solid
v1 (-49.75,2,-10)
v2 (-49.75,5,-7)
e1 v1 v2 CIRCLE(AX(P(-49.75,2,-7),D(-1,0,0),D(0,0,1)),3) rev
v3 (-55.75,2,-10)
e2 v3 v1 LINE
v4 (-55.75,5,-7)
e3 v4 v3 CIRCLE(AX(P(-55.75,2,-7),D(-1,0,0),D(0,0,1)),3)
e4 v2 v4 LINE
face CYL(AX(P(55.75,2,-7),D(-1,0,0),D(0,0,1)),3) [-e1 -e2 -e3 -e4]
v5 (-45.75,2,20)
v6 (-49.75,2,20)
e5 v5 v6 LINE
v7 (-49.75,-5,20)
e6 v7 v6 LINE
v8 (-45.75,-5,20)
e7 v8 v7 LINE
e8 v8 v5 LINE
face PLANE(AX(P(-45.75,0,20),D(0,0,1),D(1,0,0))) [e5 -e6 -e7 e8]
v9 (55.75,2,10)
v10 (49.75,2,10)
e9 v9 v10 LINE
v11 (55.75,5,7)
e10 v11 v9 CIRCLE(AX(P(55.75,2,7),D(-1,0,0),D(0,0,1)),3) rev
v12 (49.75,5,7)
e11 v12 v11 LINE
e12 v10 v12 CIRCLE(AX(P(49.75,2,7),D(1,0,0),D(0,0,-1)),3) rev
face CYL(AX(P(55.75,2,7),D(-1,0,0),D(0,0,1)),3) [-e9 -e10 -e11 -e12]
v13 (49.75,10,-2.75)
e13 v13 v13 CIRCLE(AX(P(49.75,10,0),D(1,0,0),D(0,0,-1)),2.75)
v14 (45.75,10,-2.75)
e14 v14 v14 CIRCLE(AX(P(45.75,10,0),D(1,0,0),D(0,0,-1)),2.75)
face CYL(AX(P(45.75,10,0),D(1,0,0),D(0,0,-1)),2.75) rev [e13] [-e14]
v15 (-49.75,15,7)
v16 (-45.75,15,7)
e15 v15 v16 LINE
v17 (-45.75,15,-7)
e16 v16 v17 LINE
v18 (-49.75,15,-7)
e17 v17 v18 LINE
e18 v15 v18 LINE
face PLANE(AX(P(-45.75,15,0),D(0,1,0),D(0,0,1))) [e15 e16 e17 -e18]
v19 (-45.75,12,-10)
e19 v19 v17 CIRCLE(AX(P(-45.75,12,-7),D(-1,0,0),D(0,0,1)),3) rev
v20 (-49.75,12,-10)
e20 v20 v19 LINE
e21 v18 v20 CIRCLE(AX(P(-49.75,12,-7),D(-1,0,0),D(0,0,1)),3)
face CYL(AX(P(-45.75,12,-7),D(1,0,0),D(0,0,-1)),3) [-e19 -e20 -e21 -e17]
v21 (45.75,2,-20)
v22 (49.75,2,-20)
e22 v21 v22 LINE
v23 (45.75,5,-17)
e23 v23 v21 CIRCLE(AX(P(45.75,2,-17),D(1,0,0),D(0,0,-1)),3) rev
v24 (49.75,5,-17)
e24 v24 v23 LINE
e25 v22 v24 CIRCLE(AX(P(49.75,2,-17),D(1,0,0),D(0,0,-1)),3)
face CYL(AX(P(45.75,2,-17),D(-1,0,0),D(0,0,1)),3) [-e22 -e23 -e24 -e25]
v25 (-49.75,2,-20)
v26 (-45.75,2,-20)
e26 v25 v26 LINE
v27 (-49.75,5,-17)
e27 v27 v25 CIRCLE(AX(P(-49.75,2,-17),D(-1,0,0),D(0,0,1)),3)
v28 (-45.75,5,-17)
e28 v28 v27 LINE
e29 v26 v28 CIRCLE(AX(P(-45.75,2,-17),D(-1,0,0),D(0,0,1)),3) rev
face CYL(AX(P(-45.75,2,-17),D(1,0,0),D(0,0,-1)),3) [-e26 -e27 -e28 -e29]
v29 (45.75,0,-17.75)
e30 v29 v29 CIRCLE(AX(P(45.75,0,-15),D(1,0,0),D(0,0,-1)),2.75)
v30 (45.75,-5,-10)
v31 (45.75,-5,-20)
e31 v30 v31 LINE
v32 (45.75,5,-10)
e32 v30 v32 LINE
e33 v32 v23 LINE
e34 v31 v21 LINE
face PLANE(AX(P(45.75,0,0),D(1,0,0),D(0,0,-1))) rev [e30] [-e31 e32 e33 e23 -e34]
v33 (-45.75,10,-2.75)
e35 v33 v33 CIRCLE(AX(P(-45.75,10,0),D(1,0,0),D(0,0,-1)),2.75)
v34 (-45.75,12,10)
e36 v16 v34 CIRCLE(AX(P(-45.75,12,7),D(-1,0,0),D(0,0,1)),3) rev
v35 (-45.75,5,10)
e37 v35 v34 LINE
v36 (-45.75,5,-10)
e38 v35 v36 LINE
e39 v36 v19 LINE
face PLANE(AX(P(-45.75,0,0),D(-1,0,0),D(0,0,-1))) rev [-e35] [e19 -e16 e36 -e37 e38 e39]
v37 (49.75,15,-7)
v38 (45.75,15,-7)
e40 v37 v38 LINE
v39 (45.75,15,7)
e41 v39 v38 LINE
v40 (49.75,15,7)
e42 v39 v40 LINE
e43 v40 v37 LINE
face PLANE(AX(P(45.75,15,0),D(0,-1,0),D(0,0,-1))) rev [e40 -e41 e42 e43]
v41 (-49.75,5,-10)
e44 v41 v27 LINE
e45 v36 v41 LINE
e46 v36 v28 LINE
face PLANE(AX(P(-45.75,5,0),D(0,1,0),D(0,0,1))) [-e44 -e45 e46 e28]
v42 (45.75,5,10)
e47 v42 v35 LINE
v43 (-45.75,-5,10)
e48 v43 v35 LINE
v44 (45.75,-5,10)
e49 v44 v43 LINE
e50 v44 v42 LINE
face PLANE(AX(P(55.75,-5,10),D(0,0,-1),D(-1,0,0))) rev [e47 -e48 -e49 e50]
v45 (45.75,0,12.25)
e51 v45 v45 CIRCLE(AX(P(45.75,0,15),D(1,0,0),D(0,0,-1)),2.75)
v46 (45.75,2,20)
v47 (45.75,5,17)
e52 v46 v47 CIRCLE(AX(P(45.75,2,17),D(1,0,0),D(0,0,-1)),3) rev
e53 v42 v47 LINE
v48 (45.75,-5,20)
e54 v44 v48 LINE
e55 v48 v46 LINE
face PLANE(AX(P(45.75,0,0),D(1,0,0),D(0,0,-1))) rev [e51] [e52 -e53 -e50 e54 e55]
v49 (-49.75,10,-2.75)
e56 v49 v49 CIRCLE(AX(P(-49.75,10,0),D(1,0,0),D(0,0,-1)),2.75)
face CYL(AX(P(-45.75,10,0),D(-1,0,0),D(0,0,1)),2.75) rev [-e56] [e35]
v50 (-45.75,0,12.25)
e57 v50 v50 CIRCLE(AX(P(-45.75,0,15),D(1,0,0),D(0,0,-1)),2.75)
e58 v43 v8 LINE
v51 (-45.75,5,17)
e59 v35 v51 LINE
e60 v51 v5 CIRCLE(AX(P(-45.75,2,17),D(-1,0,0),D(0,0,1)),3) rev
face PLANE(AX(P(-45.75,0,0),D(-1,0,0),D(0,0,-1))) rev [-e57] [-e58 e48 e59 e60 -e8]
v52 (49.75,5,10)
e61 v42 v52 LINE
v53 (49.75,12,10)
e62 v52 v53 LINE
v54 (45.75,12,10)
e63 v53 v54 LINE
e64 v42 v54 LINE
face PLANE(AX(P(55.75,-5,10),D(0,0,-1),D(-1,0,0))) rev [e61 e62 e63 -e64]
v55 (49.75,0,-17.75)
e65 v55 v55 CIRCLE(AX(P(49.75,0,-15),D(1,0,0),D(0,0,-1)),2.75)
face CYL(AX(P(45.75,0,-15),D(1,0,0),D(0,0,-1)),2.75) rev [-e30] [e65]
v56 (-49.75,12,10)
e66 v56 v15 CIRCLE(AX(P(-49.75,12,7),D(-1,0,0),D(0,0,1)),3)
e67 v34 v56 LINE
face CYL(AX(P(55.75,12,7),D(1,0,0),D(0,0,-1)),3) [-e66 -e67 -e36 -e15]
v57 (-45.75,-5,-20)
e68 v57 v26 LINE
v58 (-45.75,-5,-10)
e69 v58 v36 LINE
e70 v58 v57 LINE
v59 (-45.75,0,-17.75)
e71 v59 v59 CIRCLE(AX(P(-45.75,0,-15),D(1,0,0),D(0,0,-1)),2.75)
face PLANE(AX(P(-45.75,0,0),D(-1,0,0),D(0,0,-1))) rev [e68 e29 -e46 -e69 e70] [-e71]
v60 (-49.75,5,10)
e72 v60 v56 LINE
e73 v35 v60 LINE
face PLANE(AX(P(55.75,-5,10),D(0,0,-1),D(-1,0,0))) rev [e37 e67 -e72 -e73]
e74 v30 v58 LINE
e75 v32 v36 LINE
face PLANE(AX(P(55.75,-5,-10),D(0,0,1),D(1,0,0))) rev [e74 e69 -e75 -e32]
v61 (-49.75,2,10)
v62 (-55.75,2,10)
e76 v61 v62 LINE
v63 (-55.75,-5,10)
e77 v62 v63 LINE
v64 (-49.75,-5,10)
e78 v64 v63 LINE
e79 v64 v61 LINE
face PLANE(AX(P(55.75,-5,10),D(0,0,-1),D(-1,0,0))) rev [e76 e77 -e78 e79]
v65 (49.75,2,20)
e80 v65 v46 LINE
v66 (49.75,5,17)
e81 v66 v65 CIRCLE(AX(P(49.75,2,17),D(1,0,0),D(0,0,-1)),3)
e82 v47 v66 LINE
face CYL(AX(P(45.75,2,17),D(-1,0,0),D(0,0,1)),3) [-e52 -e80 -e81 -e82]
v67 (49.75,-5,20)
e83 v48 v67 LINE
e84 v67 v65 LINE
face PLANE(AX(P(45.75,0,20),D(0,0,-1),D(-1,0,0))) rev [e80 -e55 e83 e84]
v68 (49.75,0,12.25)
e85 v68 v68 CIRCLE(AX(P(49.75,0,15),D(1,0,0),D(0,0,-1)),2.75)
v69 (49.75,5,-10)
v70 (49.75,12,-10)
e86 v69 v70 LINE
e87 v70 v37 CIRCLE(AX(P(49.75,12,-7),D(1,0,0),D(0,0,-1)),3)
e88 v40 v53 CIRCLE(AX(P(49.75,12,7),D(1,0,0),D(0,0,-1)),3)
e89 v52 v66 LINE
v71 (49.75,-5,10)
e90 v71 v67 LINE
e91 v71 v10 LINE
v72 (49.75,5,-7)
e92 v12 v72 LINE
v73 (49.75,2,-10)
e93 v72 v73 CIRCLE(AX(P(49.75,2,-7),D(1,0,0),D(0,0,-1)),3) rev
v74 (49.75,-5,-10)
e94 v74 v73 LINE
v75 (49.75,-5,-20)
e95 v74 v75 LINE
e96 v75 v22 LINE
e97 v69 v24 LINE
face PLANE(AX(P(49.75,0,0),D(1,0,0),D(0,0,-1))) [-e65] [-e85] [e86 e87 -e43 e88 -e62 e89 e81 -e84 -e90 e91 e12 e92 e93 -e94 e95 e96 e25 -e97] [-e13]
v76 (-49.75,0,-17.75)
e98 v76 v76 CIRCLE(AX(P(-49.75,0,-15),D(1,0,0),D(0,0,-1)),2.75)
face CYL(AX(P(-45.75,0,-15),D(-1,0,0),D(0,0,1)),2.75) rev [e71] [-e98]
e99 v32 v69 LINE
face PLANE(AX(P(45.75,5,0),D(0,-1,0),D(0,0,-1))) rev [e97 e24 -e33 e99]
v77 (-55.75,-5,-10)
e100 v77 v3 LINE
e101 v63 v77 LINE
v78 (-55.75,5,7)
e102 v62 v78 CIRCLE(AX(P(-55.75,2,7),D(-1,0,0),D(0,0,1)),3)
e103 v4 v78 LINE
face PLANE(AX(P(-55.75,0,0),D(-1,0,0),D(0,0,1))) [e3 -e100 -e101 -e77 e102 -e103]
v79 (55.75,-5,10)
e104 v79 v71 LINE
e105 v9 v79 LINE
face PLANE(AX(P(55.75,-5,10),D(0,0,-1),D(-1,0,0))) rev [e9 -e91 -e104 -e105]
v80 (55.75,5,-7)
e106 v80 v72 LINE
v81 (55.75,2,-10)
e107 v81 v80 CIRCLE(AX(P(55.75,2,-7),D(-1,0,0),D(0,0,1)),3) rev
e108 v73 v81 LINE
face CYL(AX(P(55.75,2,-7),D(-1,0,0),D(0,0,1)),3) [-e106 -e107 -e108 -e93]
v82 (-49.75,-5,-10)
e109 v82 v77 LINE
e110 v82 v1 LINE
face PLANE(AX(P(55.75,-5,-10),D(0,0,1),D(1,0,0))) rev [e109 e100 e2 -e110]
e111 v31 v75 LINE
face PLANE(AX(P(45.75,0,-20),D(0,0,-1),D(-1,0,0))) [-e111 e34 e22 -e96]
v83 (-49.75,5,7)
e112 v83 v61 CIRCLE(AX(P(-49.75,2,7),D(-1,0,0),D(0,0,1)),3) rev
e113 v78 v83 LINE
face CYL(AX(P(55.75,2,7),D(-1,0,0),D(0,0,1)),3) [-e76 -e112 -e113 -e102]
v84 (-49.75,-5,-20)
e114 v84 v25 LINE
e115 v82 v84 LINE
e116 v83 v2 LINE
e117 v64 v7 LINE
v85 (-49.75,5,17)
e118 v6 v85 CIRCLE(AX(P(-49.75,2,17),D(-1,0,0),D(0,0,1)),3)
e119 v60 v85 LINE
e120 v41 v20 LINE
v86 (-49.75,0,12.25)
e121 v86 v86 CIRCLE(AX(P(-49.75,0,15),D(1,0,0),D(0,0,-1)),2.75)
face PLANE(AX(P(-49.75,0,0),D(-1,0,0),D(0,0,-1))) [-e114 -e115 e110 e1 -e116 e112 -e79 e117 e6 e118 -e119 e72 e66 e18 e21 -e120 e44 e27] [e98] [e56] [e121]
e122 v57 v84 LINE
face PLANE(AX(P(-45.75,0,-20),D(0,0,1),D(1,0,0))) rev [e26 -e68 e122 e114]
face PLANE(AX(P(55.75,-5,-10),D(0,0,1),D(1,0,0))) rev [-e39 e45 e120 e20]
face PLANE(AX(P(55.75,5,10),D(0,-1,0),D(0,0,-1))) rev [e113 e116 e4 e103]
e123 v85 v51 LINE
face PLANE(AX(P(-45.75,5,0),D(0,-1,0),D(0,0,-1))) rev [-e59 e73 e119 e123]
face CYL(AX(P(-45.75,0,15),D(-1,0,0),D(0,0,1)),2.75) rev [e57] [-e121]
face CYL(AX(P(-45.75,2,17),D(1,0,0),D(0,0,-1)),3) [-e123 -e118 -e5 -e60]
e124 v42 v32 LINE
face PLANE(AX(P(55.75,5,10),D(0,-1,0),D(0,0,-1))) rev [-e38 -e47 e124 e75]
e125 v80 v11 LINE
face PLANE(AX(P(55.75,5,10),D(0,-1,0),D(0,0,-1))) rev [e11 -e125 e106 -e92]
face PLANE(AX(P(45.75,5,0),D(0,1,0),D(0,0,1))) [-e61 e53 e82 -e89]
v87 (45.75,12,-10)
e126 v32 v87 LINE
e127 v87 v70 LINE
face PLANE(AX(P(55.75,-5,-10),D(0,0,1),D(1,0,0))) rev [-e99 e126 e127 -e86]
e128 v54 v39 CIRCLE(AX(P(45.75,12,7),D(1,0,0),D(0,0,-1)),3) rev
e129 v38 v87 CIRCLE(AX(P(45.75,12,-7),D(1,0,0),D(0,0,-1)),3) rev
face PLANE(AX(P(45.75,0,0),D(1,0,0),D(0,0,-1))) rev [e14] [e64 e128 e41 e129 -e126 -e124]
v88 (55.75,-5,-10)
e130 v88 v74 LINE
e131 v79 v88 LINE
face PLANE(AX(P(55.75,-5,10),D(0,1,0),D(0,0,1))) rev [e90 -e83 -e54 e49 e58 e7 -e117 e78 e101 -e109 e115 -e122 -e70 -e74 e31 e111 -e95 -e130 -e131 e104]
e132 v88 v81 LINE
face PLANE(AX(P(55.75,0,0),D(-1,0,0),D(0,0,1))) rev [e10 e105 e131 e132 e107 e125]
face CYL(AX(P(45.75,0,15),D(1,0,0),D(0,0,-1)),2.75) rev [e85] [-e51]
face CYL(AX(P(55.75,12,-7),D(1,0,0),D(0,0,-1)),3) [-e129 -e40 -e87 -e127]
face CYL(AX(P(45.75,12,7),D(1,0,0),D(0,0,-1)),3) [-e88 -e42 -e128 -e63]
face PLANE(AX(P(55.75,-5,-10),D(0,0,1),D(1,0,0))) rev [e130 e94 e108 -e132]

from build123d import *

# Parameters (mm, degrees)
SKETCH_2_W             = 20
SKETCH_2_H             = 10
EXTRUDE_1_DEPTH        = 55.75
SKETCH_3_W             = 20
SKETCH_3_H             = 10
SKETCH_3_R             = 2.75
SKETCH_3_W_2           = 10
EXTRUDE_2_DEPTH        = 4
FILLET_1_R             = 3
FILLET_1_OF_MIRROR_1_R = 3
FILLET_2_R             = 3


with BuildPart() as part:
    # 草图2 → 凸台-拉伸1 (new, symmetric)
    with BuildSketch(Plane(origin=(0, 0, 0), x_dir=(0, 0, -1), z_dir=(1, 0, 0))):
        Rectangle(SKETCH_2_W, SKETCH_2_H)
    extrude(amount=EXTRUDE_1_DEPTH, both=True)

    # 草图3 → 凸台-拉伸2 (add)
    # profile 1 of 3: a face of its own
    with BuildSketch(Plane(origin=(49.75, 0, 0), x_dir=(0, 0, -1), z_dir=(1, 0, 0))):
        with Locations((0, 10)):
            Rectangle(SKETCH_3_W, SKETCH_3_H)
        with Locations((0, 10)):
            Circle(SKETCH_3_R, mode=Mode.SUBTRACT)
    # profile 2 of 3: a face of its own
    with BuildSketch(Plane(origin=(49.75, 0, 0), x_dir=(0, 0, -1), z_dir=(1, 0, 0))):
        with Locations((15, 0)):
            Rectangle(SKETCH_3_W_2, SKETCH_3_H)
        with Locations((15, 0)):
            Circle(SKETCH_3_R, mode=Mode.SUBTRACT)
    # profile 3 of 3: a face of its own
    with BuildSketch(Plane(origin=(49.75, 0, 0), x_dir=(0, 0, -1), z_dir=(1, 0, 0))):
        with Locations((-15, 0)):
            Rectangle(SKETCH_3_W_2, SKETCH_3_H)
        with Locations((-15, 0)):
            Circle(SKETCH_3_R, mode=Mode.SUBTRACT)
    extrude_2 = extrude(amount=-EXTRUDE_2_DEPTH)

    # 圆角1
    fillet_1_edges = [part.edges().sort_by_distance(p)[0] for p in [
        (47.75, 15, 10),
        (47.75, 15, -10),
        (47.75, 5, -20),
        (47.75, 5, 20),
    ]]
    fillet(fillet_1_edges, radius=FILLET_1_R)

    # 镜向1: 凸台-拉伸2 across plane
    add(extrude_2.mirror(Plane(origin=(0, 0, 0), x_dir=(0, 0, 1), z_dir=(1, 0, 0))))

    # 圆角1 of 镜向1
    fillet_1_of_mirror_1_edges = [part.edges().sort_by_distance(p)[0] for p in [
        (-47.75, 15, 10),
        (-47.75, 15, -10),
        (-47.75, 5, -20),
        (-47.75, 5, 20),
    ]]
    fillet(fillet_1_of_mirror_1_edges, radius=FILLET_1_OF_MIRROR_1_R)

    # 圆角2
    # the kernel refuses this fillet: 3 mm, written as the material it takes off along each edge
    with BuildSketch(Plane(origin=(63.25, 5, 10), x_dir=(0, -1, 0), z_dir=(-1, 0, 0)), Plane(origin=(49.75, 5, -10), x_dir=(0, -1, 0), z_dir=(1, 0, 0)), Plane(origin=(-49.75, 5, 10), x_dir=(0, -1, 0), z_dir=(-1, 0, 0)), Plane(origin=(-63.25, 5, -10), x_dir=(0, -1, 0), z_dir=(1, 0, 0))) as fillet_2_piece_1:
        with BuildLine():
            CenterArc((FILLET_2_R, -FILLET_2_R), FILLET_2_R, 90, 90)
            Line((0, -FILLET_2_R), (0, 0))
            Line((0, 0), (FILLET_2_R, 0))
        make_face()
    extrude(amount=13.5, mode=Mode.SUBTRACT)


solid = part.part
